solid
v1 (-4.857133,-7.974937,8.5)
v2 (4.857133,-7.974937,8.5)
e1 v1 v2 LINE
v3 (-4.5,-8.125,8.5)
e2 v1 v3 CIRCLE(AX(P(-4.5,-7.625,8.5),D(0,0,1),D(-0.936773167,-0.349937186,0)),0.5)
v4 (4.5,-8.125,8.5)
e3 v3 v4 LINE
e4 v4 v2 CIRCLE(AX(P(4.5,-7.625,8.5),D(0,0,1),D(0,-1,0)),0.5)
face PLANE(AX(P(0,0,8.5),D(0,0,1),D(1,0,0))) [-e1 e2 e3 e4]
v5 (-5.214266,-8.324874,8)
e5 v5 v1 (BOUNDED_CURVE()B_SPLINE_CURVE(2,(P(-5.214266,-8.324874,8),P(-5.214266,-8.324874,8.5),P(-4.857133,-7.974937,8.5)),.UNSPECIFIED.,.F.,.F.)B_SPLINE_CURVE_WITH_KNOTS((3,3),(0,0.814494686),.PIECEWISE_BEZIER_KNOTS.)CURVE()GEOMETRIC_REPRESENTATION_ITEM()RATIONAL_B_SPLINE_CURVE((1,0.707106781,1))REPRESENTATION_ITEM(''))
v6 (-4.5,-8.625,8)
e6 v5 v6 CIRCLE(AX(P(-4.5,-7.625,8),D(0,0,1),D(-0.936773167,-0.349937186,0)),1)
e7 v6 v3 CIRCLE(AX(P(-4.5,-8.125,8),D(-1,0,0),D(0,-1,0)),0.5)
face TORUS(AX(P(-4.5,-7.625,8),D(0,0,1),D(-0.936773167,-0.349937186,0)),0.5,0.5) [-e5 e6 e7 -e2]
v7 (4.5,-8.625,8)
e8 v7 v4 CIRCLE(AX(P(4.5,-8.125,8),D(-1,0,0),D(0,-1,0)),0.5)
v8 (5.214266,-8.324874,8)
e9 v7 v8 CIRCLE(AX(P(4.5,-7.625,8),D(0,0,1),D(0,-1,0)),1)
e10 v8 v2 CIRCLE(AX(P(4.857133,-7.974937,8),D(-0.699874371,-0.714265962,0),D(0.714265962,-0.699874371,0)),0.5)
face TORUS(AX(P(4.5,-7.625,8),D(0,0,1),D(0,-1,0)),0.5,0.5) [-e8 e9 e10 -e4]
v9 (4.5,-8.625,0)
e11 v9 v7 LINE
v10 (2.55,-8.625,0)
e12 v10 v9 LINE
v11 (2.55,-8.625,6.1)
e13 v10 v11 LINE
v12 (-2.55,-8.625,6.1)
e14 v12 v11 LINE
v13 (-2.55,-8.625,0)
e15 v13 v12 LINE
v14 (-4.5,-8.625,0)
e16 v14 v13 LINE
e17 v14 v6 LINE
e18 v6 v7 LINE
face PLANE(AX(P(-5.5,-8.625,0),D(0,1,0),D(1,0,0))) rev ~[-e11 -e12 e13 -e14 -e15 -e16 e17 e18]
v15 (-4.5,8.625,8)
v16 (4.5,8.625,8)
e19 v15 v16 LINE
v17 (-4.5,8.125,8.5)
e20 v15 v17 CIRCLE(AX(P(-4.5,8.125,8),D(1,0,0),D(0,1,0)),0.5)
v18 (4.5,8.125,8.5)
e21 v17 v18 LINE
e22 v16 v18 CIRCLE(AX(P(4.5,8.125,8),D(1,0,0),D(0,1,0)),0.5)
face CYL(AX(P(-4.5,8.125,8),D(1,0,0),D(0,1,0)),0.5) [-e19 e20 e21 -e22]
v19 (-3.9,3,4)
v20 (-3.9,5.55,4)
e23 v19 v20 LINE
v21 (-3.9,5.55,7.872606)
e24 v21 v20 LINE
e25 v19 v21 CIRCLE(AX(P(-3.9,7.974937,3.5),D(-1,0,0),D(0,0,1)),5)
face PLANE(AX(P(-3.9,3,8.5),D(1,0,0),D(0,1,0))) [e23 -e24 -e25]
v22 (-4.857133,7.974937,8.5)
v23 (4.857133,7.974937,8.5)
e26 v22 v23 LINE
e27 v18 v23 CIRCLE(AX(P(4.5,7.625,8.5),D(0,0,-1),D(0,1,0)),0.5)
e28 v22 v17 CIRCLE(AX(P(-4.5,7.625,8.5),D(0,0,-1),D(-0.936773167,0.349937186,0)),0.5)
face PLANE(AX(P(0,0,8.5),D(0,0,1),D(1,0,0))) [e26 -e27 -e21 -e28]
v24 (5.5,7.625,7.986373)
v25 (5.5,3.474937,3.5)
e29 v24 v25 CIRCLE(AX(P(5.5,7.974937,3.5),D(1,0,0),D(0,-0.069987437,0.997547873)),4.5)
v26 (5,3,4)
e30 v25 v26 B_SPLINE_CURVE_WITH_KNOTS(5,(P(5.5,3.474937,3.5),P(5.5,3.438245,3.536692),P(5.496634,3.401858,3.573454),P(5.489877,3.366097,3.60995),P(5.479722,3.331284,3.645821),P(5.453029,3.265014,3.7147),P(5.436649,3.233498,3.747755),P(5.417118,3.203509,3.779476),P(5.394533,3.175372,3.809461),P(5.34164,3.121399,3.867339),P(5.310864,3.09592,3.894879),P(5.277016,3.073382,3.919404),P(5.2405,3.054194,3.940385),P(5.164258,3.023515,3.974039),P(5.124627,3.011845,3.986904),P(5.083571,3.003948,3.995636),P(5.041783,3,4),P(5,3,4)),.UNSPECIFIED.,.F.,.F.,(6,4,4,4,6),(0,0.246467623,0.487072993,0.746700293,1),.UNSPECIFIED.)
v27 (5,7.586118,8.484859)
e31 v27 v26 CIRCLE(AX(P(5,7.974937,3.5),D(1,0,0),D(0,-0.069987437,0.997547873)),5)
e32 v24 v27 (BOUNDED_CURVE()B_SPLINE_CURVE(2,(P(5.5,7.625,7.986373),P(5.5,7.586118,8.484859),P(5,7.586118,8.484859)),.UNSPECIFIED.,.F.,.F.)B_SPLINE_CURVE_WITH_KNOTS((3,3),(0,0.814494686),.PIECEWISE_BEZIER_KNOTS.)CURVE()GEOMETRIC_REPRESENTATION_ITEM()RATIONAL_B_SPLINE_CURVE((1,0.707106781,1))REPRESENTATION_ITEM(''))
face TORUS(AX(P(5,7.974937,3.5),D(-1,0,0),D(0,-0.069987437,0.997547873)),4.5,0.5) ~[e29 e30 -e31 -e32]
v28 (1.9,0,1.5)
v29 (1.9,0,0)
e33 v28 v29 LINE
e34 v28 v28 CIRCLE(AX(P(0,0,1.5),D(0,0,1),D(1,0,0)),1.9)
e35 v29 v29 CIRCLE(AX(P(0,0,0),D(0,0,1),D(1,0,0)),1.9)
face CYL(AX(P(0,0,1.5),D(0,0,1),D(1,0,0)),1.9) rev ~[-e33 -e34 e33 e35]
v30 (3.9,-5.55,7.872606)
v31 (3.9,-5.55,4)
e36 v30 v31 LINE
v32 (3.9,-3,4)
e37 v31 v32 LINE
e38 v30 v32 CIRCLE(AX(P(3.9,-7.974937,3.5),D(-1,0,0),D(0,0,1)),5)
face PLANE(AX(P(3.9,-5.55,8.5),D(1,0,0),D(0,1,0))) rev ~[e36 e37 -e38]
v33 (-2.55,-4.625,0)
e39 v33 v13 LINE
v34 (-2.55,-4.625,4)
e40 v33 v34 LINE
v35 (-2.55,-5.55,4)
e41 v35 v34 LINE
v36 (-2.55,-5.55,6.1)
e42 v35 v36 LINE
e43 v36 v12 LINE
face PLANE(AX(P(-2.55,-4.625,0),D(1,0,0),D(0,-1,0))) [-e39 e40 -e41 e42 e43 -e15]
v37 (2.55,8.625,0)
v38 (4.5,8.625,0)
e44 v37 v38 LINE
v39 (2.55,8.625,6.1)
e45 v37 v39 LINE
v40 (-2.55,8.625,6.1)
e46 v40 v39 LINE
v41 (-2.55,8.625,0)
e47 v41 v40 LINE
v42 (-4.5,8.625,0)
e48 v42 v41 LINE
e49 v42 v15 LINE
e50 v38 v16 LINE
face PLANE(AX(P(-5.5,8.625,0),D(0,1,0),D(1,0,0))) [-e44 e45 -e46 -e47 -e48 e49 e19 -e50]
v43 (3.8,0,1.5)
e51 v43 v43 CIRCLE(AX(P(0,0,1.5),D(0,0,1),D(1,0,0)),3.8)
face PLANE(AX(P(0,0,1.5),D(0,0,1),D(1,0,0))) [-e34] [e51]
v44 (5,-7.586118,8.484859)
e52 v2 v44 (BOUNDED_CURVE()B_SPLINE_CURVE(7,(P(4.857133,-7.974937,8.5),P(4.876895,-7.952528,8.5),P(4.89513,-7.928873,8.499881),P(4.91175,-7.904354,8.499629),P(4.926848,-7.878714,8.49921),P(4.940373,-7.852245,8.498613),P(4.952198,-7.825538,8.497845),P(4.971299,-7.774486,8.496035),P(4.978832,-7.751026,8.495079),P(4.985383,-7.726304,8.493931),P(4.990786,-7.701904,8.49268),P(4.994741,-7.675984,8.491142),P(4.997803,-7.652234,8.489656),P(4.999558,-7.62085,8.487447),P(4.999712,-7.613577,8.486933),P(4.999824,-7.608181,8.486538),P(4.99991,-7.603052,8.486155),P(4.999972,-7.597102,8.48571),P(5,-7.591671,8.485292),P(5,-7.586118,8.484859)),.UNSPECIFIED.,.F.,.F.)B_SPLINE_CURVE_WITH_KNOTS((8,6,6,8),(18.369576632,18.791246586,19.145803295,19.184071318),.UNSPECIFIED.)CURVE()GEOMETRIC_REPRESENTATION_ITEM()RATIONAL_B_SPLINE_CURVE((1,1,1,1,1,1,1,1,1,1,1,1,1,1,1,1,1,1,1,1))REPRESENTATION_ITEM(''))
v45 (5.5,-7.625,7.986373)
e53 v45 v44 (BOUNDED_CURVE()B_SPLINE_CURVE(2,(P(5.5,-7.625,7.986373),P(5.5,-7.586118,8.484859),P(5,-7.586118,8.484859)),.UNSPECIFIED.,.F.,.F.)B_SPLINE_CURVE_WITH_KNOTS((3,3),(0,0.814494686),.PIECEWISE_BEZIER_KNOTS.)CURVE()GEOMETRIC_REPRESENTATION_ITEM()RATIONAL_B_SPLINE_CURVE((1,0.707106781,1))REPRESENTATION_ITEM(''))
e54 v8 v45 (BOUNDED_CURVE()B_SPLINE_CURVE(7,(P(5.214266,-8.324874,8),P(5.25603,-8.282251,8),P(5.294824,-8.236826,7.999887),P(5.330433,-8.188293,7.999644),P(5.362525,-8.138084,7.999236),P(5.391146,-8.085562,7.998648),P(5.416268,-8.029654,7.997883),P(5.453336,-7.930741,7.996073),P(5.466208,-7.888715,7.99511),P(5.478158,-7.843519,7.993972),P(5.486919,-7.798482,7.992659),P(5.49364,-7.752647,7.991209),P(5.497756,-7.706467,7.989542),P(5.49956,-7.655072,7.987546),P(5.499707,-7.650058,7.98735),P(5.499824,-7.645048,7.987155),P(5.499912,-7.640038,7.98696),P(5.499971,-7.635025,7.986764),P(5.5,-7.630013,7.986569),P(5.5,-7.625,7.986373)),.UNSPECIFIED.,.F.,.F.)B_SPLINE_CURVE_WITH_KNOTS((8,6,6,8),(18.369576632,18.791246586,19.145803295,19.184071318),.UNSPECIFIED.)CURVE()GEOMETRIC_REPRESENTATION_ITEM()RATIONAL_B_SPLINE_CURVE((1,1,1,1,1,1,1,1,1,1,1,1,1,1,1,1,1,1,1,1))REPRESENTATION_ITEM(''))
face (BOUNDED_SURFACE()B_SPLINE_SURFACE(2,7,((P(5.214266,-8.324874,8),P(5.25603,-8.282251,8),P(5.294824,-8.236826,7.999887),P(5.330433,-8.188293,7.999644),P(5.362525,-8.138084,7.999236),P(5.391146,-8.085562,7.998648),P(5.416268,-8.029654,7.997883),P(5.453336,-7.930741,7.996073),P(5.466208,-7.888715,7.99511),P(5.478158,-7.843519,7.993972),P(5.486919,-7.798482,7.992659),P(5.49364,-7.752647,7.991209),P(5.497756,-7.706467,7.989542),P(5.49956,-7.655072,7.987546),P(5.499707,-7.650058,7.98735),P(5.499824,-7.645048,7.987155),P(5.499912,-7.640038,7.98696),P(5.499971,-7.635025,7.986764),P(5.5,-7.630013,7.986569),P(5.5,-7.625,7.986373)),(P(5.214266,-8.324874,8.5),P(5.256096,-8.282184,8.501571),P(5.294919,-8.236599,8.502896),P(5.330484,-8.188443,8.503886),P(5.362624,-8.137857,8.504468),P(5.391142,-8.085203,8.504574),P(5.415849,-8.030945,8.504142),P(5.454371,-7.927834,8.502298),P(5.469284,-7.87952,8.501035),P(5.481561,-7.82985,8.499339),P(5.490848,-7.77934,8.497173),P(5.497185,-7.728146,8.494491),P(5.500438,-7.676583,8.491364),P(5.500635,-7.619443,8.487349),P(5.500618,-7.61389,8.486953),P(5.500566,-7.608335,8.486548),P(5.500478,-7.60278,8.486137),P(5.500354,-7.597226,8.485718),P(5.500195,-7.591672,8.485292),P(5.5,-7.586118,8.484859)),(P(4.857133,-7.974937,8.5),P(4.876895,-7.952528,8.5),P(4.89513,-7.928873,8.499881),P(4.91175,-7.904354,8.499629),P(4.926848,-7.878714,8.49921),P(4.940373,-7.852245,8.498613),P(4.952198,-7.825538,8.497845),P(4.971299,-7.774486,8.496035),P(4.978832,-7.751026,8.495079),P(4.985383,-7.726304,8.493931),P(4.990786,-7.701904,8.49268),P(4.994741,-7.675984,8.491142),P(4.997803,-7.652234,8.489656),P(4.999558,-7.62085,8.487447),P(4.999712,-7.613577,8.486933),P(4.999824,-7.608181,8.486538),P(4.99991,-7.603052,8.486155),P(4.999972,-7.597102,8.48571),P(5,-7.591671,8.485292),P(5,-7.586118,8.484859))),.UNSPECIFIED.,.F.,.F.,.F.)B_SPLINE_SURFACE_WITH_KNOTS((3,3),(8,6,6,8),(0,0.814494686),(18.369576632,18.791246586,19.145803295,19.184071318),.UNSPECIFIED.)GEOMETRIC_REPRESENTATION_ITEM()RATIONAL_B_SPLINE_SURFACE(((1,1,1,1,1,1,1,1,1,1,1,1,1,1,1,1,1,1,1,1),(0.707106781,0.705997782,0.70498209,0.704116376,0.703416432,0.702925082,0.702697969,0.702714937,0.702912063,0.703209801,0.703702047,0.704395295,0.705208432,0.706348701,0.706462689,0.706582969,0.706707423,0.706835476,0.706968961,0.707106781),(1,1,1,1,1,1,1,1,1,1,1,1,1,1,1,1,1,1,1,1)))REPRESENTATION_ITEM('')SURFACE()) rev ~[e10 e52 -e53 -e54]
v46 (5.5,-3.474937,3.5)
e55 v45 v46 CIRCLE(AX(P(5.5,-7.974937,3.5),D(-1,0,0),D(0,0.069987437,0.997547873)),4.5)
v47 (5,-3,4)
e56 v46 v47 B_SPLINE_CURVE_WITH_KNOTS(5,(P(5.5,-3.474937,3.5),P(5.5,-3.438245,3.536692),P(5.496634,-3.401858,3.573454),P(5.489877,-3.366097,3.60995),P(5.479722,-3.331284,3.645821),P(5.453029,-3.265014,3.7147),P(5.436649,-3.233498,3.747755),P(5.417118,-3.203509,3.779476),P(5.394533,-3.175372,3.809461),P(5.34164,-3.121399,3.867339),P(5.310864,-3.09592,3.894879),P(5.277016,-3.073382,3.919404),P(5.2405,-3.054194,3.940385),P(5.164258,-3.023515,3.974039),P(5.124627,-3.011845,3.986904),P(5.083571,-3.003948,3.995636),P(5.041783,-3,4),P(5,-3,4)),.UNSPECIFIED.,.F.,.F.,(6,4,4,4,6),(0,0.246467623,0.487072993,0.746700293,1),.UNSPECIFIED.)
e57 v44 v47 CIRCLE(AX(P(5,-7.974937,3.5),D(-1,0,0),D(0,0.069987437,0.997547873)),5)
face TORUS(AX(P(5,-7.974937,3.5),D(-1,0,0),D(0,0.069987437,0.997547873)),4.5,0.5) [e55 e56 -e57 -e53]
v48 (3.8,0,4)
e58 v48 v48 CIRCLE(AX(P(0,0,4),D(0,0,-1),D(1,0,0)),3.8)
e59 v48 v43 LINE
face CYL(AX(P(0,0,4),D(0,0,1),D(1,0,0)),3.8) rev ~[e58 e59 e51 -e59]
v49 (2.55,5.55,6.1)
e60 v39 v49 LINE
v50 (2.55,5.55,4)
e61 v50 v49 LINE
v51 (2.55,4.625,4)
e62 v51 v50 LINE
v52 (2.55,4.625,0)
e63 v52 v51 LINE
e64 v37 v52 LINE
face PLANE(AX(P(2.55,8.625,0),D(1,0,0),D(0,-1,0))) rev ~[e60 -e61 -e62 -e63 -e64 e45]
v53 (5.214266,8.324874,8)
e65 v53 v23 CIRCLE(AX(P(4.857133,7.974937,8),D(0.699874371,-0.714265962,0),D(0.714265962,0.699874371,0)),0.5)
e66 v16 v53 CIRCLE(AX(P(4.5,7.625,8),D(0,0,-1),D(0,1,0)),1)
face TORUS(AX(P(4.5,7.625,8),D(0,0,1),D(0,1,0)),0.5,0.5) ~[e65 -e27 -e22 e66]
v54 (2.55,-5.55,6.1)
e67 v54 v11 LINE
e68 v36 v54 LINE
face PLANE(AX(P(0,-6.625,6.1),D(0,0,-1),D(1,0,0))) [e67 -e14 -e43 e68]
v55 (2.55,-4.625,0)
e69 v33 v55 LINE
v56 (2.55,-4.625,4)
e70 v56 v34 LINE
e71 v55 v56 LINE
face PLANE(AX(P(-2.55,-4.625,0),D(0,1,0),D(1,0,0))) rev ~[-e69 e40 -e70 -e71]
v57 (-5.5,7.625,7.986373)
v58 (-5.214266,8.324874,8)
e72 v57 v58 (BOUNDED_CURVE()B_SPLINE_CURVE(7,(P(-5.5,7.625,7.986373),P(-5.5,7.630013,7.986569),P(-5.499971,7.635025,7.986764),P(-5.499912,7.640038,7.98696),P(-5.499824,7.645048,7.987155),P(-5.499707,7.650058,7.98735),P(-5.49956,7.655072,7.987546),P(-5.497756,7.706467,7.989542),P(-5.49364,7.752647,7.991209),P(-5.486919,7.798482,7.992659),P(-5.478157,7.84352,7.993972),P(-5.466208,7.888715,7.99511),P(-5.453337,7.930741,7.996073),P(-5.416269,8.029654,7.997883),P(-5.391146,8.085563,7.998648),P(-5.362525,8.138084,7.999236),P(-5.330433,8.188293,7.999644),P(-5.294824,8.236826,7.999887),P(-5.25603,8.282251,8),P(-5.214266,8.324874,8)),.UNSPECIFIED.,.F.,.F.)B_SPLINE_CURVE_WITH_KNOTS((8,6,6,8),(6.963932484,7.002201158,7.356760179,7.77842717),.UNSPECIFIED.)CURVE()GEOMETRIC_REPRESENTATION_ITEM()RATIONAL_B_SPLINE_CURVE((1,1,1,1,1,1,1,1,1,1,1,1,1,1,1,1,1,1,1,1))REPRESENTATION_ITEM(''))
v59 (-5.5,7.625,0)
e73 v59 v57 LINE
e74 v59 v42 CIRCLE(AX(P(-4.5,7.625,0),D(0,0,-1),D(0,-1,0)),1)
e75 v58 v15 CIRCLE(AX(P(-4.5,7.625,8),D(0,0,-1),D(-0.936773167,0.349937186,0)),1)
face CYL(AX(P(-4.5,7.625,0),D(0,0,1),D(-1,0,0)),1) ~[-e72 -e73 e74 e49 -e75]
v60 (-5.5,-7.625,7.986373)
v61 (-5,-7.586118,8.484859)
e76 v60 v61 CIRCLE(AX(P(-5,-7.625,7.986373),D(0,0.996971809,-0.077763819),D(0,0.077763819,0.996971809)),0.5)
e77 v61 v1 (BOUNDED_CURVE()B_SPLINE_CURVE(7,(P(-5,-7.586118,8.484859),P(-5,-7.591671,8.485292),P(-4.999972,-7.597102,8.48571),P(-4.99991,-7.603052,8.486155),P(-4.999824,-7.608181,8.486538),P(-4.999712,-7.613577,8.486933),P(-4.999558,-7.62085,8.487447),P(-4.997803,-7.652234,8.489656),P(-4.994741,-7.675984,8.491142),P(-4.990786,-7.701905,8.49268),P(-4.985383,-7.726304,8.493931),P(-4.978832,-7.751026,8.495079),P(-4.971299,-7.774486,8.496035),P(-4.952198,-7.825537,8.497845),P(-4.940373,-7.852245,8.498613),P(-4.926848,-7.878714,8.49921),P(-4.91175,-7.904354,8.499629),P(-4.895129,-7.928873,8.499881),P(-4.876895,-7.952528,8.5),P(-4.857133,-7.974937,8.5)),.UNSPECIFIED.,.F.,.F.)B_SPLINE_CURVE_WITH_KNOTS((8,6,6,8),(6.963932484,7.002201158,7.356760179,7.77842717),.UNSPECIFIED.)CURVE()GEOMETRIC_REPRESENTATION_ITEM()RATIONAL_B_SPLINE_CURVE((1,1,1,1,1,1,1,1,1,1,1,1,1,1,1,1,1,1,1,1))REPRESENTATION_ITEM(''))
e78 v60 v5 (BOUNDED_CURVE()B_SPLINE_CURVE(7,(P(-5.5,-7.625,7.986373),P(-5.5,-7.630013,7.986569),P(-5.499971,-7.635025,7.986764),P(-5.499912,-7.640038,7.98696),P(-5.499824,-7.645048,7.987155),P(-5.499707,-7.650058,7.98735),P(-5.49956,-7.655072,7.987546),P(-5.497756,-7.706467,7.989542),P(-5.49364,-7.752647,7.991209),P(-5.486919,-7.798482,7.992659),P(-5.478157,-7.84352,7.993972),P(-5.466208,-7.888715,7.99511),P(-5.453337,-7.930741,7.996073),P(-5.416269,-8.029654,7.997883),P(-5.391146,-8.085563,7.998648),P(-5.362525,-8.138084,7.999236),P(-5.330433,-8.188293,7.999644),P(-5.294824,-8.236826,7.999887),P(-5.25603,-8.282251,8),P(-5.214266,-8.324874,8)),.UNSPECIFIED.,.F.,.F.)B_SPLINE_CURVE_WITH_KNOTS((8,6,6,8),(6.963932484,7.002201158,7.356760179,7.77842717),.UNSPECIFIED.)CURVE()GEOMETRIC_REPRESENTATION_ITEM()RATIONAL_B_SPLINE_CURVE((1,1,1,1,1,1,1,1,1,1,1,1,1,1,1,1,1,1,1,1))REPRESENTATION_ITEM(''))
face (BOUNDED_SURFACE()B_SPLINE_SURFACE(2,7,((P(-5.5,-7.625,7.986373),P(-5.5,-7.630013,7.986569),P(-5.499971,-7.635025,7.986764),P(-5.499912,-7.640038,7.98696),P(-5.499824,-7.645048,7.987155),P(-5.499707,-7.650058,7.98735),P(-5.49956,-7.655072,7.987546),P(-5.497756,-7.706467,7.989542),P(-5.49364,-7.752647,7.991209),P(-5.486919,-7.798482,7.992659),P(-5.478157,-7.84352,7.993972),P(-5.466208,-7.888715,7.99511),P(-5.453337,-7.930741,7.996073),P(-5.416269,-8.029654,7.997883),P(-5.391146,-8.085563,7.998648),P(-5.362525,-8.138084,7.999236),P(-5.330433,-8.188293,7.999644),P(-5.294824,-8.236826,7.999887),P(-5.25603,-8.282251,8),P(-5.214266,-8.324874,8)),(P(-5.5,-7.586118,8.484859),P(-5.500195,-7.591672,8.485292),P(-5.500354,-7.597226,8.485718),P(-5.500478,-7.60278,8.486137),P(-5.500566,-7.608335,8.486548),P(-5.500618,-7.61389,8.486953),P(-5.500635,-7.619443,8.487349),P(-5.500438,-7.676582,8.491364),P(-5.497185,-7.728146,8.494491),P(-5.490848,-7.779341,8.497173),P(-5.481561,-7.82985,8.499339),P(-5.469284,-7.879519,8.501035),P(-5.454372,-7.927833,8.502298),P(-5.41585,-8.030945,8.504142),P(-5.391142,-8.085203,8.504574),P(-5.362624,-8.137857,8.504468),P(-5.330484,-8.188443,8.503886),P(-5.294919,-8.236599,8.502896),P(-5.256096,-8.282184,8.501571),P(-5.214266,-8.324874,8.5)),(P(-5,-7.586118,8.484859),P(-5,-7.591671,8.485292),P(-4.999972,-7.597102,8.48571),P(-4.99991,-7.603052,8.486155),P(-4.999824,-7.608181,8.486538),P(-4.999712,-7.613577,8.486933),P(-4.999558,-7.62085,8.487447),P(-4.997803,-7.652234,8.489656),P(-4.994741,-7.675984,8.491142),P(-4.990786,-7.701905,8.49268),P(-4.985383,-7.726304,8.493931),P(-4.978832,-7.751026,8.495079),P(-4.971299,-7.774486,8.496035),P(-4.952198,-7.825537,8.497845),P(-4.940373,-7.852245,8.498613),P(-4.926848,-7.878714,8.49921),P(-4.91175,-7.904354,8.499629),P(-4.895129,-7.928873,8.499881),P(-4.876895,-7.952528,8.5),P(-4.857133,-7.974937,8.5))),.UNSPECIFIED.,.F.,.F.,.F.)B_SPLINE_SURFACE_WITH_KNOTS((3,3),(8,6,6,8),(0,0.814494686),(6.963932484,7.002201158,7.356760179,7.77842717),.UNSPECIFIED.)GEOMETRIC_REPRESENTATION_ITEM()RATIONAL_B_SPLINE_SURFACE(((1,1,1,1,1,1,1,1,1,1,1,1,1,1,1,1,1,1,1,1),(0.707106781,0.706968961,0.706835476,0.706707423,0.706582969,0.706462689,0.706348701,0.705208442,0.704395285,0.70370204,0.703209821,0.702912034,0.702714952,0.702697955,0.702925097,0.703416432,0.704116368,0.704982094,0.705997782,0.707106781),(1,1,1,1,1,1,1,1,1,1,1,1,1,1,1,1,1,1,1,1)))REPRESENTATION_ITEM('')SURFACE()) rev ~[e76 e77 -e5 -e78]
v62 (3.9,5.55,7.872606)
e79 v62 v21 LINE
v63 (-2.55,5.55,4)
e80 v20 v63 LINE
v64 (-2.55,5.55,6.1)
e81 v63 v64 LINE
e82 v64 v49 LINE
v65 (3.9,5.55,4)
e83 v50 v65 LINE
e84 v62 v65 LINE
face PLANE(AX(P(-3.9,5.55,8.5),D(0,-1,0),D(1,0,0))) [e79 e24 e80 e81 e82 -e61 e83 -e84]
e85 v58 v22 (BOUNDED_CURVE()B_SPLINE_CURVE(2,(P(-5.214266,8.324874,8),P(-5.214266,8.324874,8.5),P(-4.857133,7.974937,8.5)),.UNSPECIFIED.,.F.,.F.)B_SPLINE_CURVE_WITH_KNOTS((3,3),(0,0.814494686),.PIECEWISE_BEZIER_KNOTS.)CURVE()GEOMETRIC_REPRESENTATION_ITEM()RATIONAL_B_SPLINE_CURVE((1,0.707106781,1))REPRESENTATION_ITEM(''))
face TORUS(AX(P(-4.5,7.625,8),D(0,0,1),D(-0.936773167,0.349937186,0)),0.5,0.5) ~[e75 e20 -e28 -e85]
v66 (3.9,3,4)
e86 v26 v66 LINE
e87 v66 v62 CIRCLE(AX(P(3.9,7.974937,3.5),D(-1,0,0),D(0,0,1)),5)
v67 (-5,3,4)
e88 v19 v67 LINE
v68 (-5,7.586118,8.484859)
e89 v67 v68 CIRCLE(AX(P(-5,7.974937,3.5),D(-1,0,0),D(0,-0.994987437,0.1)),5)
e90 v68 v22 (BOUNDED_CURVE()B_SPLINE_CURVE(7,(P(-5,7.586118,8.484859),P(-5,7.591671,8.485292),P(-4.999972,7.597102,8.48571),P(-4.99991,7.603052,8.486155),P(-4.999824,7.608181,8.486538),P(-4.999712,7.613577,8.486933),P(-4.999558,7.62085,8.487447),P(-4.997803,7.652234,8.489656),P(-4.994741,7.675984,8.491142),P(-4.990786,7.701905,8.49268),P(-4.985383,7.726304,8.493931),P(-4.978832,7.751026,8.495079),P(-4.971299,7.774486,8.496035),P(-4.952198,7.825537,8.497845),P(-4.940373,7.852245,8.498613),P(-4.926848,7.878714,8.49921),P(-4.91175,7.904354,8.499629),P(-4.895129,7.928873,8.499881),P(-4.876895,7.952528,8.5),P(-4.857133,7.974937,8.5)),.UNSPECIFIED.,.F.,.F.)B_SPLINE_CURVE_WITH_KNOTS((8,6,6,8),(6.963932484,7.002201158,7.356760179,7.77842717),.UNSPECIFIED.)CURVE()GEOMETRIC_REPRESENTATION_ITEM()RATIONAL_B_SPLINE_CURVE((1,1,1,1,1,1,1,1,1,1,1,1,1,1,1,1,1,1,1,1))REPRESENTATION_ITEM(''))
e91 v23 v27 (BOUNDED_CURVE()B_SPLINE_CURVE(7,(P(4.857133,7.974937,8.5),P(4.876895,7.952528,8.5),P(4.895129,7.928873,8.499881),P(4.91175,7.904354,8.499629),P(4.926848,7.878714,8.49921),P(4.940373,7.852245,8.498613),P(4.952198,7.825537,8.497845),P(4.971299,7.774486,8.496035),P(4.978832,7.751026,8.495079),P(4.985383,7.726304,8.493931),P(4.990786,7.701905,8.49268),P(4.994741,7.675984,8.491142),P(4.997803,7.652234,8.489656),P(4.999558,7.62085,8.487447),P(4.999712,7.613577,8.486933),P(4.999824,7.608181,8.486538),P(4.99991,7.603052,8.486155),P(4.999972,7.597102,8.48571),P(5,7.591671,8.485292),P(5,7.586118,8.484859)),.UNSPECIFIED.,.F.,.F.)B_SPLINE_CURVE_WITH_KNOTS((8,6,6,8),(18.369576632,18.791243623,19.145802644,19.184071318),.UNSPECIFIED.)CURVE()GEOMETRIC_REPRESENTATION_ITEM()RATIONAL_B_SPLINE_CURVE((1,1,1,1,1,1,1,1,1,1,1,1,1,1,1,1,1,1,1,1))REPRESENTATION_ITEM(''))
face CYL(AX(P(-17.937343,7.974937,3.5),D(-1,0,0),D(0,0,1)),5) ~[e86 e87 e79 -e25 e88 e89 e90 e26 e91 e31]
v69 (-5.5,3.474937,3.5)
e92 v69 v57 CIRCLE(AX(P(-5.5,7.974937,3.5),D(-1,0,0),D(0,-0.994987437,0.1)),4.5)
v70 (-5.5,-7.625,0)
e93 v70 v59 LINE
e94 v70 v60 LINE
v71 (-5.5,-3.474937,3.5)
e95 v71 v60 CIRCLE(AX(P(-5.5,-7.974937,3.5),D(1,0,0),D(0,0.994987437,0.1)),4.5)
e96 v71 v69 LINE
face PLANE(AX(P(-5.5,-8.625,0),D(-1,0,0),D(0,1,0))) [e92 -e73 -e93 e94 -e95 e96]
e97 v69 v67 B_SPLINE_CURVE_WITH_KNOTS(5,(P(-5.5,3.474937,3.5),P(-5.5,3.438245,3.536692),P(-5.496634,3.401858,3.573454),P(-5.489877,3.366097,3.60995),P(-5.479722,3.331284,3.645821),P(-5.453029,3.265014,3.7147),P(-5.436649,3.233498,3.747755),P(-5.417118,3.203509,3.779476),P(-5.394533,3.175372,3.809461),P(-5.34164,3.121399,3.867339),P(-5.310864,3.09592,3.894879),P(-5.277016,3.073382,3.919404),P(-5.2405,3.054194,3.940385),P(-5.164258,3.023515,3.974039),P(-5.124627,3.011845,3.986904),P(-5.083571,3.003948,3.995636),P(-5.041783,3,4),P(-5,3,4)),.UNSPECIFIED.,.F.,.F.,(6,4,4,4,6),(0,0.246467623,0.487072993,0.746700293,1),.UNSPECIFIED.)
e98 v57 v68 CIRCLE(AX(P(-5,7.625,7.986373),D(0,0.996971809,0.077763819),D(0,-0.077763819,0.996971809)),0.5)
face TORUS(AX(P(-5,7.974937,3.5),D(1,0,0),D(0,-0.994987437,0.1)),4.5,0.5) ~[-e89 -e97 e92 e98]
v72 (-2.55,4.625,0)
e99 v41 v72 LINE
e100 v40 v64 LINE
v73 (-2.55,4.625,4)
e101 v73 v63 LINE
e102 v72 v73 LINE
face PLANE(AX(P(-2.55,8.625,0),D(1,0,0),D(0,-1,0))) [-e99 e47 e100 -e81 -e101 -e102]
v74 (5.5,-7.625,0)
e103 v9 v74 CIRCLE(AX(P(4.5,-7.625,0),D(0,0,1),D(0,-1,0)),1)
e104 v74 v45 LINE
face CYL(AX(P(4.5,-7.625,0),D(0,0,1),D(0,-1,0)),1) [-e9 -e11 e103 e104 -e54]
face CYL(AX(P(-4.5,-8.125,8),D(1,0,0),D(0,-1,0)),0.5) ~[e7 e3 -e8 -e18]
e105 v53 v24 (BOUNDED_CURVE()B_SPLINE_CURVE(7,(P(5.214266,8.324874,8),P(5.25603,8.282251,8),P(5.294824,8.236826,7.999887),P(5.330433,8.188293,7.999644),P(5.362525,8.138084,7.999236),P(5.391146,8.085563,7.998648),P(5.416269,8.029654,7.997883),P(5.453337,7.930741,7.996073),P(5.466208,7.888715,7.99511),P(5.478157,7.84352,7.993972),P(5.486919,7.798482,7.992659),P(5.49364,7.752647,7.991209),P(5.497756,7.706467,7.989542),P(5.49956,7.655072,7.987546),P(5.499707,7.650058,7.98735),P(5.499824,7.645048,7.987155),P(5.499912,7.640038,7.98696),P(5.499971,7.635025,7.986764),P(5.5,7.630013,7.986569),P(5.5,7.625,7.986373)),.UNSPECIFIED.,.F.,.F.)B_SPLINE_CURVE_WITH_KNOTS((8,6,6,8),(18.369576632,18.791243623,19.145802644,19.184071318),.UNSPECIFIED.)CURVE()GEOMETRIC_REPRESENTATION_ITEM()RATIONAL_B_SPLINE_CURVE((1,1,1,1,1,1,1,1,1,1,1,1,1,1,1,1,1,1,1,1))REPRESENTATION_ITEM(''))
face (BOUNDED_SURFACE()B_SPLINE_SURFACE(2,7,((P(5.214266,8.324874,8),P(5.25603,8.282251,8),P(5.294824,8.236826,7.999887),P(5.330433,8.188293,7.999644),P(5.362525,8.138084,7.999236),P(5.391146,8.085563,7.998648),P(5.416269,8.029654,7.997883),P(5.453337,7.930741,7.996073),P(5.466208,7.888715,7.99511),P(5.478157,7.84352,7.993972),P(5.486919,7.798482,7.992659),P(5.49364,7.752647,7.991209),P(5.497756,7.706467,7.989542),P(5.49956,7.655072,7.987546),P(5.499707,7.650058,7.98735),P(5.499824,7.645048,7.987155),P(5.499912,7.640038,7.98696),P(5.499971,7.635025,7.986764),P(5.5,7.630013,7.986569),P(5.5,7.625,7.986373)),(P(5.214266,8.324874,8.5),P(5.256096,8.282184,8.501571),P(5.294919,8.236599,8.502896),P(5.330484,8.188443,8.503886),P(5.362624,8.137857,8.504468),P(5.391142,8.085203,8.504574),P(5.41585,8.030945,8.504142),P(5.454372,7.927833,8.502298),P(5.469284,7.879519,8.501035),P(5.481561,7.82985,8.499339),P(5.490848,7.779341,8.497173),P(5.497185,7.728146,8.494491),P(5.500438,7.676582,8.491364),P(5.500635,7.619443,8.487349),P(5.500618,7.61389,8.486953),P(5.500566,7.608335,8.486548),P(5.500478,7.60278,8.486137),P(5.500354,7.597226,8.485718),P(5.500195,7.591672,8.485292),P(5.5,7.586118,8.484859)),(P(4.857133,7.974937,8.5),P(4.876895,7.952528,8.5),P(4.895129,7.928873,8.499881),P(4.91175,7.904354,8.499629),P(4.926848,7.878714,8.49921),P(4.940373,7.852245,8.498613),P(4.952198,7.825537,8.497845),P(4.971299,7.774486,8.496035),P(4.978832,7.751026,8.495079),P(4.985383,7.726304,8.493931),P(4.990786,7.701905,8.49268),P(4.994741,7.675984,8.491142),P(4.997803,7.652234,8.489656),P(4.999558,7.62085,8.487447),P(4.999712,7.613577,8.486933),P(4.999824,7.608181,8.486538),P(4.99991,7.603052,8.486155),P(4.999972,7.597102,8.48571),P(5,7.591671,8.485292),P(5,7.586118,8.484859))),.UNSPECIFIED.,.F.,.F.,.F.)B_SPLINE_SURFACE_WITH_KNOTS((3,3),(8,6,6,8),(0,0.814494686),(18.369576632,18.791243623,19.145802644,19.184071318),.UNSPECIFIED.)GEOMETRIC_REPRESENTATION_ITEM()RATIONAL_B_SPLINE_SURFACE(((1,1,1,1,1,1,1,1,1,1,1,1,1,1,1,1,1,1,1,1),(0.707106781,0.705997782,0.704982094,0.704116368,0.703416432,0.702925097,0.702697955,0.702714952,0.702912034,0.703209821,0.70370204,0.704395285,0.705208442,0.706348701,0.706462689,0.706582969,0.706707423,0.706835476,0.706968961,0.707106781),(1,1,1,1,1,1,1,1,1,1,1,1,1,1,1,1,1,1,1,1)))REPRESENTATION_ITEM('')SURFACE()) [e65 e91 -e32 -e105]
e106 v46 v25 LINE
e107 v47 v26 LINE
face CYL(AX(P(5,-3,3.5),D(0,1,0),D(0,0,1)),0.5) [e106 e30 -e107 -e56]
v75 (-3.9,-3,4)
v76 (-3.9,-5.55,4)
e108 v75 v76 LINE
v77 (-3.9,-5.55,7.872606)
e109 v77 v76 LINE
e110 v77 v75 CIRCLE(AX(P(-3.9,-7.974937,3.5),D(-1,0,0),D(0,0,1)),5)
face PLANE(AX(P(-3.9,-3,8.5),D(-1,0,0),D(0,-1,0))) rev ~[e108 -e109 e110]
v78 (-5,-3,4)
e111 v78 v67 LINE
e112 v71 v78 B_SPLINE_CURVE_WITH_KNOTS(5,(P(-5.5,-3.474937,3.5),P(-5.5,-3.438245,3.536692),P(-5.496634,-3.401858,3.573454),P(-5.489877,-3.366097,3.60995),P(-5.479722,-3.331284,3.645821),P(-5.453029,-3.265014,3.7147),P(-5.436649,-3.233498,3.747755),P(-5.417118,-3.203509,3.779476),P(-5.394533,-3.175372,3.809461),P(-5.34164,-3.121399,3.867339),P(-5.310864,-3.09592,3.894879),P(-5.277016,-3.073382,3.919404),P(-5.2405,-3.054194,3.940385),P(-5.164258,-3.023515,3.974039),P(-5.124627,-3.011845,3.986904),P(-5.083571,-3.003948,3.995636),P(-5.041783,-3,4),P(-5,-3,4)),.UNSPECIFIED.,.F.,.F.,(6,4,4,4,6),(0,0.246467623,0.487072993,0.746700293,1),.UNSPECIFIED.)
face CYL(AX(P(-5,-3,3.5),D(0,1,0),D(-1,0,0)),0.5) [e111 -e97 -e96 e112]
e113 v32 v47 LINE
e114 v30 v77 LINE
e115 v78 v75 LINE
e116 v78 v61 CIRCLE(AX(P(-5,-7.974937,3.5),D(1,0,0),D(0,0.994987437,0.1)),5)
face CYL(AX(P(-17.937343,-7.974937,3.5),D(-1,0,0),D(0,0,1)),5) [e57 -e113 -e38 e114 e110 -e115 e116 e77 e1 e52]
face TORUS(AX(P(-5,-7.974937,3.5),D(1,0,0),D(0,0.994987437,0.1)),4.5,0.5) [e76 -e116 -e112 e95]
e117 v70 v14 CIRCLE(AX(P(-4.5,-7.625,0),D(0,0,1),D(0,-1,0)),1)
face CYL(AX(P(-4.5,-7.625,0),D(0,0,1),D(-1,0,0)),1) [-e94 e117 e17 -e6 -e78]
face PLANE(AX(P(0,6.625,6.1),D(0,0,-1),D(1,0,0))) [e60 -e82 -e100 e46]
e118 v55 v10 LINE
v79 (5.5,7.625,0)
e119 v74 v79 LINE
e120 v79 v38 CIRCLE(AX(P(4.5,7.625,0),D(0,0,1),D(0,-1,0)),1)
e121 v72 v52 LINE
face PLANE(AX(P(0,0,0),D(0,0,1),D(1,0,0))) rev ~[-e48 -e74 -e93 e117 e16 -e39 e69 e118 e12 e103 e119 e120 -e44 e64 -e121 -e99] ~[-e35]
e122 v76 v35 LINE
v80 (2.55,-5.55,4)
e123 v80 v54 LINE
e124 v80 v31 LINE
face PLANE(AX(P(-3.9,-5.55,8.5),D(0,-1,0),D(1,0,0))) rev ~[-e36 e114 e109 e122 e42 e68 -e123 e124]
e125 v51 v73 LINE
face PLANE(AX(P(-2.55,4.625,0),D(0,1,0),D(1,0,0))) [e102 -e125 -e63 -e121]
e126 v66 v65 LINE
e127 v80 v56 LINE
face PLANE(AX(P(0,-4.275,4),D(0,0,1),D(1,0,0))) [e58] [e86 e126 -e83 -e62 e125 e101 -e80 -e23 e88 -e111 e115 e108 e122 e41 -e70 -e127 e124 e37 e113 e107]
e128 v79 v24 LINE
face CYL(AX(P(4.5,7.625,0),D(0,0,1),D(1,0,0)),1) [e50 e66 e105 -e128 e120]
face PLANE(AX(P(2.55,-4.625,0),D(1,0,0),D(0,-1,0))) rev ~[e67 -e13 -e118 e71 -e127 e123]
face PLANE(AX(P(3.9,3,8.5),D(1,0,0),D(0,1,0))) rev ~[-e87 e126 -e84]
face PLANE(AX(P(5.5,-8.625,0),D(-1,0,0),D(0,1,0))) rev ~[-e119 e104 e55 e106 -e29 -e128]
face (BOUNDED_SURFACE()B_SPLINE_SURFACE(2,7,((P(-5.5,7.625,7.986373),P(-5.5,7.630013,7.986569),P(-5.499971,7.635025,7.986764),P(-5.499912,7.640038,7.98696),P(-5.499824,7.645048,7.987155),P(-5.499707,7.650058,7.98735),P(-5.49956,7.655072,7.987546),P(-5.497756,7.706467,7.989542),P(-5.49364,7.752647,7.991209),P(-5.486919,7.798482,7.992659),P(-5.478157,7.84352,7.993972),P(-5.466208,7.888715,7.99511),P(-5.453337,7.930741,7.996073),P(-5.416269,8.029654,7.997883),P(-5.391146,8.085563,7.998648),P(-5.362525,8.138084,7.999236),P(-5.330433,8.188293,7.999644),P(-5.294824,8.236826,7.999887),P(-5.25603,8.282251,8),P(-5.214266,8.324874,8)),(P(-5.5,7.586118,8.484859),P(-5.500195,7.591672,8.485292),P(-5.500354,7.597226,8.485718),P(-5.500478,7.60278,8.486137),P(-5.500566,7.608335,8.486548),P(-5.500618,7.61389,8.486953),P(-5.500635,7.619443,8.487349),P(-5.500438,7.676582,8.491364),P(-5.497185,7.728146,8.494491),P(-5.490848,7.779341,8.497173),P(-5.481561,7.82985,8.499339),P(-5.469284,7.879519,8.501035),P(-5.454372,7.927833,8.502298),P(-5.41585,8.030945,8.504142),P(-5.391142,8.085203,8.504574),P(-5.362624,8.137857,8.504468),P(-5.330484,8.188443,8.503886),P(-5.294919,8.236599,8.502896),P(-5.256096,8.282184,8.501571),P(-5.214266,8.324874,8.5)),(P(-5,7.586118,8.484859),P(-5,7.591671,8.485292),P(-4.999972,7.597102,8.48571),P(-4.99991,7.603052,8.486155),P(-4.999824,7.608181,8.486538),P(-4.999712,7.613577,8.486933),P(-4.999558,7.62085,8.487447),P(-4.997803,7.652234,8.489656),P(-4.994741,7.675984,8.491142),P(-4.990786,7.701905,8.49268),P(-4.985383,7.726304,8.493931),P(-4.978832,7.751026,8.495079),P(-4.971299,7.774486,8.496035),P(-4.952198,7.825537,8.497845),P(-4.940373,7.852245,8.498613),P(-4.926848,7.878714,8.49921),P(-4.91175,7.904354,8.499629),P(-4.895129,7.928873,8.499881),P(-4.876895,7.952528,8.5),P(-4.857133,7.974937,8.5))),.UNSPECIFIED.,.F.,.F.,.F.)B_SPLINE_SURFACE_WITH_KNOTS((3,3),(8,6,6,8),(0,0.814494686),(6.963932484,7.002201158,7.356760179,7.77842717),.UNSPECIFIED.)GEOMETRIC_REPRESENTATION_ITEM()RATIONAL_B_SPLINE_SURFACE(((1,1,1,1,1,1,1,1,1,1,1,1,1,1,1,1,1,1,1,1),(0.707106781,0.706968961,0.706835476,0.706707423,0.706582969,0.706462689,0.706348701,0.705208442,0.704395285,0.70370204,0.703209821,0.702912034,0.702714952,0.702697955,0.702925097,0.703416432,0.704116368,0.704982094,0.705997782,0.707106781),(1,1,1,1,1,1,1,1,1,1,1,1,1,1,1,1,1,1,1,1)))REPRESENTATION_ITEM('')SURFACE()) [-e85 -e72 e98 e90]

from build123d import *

# Parameters (mm, degrees)
F0_W         = 11
F0_H         = 17.25
F1_DEPTH     = 8.5
F2_W         = 7.8
F2_H         = 2.55
F2_H_2       = 6
F2_W_2       = 1.6
F3_DEPTH     = 4.5
F4_W         = 5.1
F4_H         = 4
F5_DEPTH     = 6.1
F6_R         = 3.8
F7_DEPTH     = 2.5
F8_R         = 1.9
F9_DEPTH     = 1.501
F10_T1_DEPTH = 26.4746859277
F11_R        = 1
F12_R        = 0.5


# Not quite as in the source:
# - a fillet or chamfer that OpenCascade refuses, or shapes differently, is made with other operations: its cross-section is extruded or revolved along the edge and cut away or added


with BuildPart() as f1:
    # F0 (on Top) → F1 (new body)
    with BuildSketch(Plane.XY):
        Rectangle(F0_W, F0_H)
    extrude(amount=F1_DEPTH)

    # F2 (on face) → F3 (cut)
    with BuildSketch(Plane.XY.offset(8.5)):
        with Locations((0, -4.275)):
            Rectangle(F2_W, F2_H)
        Rectangle(F2_W, F2_H_2)
        with Locations((4.7, 0)):
            Rectangle(F2_W_2, F2_H_2)
        with Locations((-4.7, 0)):
            Rectangle(F2_W_2, F2_H_2)
        with Locations((0, 4.275)):
            Rectangle(F2_W, F2_H)
    extrude(amount=-F3_DEPTH, mode=Mode.SUBTRACT)

    # F4 (on face) → F5 (cut)
    with BuildSketch(Plane(origin=(0, 0, 0), x_dir=(1, 0, 0), z_dir=(0, 0, -1))):
        with Locations((0, -6.625)):
            Rectangle(F4_W, F4_H)
        with Locations((0, 6.625)):
            Rectangle(F4_W, F4_H)
    extrude(amount=-F5_DEPTH, mode=Mode.SUBTRACT)

    # F6 (on face) → F7 (cut)
    with BuildSketch(Plane.XY.offset(4)):
        Circle(F6_R)
    extrude(amount=-F7_DEPTH, mode=Mode.SUBTRACT)

    # F8 (on face) → F9 (cut, through all)
    with BuildSketch(Plane.XY.offset(1.5)):
        Circle(F8_R)
    extrude(amount=-F9_DEPTH, mode=Mode.SUBTRACT)

    # F10: fillet of radius 5 on 2 edges, made by hand

    # F10_s2 → F10_t1 (cut)
    with BuildSketch(Plane.YZ.offset(-17.9373429638)):
        with BuildLine():
            ThreePointArc((-7.9749371855, 8.5), (-4.6208352193, 7.2080992435), (-3, 4))
            Line((-3, 4), (-3, 8.5))
            Line((-3, 8.5), (-7.9749371855, 8.5))
        make_face()
        with BuildLine():
            ThreePointArc((7.9749371855, 8.5), (4.6208352193, 7.2080992435), (3, 4))
            Line((3, 4), (3, 8.5))
            Line((3, 8.5), (7.9749371855, 8.5))
        make_face()
    extrude(amount=F10_T1_DEPTH, mode=Mode.SUBTRACT)

    # F11
    f11_edges = [f1.edges().sort_by_distance(p)[0] for p in [
        (5.5, -8.625, 4.25),
        (-5.5, -8.625, 4.25),
        (5.5, 8.625, 4.25),
        (-5.5, 8.625, 4.25),
    ]]
    fillet(f11_edges, radius=F11_R)

    # F12
    f12_edges = [f1.edges().sort_by_distance(p)[0] for p in [
        (0, 8.625, 8.5),
        (0, -8.625, 8.5),
        (-5.5, 0, 4),
        (5.5, 0, 4),
        (5.5, -4.493052, 7.088381),
        (5.5, 4.493052, 7.088381),
        (5.483858, -7.803952, 8.497076),
        (5.070115, -8.446565, 8.5),
        (5.483858, 7.803952, 8.497076),
        (5.070115, 8.446565, 8.5),
        (-5.5, -4.493052, 7.088381),
        (-5.483858, -7.803951, 8.497076),
        (-5.5, 4.493052, 7.088381),
        (-5.483858, 7.803952, 8.497076),
        (-5.070115, -8.446565, 8.5),
        (-5.070115, 8.446565, 8.5),
    ]]
    fillet(f12_edges, radius=F12_R)


solid = f1.part
